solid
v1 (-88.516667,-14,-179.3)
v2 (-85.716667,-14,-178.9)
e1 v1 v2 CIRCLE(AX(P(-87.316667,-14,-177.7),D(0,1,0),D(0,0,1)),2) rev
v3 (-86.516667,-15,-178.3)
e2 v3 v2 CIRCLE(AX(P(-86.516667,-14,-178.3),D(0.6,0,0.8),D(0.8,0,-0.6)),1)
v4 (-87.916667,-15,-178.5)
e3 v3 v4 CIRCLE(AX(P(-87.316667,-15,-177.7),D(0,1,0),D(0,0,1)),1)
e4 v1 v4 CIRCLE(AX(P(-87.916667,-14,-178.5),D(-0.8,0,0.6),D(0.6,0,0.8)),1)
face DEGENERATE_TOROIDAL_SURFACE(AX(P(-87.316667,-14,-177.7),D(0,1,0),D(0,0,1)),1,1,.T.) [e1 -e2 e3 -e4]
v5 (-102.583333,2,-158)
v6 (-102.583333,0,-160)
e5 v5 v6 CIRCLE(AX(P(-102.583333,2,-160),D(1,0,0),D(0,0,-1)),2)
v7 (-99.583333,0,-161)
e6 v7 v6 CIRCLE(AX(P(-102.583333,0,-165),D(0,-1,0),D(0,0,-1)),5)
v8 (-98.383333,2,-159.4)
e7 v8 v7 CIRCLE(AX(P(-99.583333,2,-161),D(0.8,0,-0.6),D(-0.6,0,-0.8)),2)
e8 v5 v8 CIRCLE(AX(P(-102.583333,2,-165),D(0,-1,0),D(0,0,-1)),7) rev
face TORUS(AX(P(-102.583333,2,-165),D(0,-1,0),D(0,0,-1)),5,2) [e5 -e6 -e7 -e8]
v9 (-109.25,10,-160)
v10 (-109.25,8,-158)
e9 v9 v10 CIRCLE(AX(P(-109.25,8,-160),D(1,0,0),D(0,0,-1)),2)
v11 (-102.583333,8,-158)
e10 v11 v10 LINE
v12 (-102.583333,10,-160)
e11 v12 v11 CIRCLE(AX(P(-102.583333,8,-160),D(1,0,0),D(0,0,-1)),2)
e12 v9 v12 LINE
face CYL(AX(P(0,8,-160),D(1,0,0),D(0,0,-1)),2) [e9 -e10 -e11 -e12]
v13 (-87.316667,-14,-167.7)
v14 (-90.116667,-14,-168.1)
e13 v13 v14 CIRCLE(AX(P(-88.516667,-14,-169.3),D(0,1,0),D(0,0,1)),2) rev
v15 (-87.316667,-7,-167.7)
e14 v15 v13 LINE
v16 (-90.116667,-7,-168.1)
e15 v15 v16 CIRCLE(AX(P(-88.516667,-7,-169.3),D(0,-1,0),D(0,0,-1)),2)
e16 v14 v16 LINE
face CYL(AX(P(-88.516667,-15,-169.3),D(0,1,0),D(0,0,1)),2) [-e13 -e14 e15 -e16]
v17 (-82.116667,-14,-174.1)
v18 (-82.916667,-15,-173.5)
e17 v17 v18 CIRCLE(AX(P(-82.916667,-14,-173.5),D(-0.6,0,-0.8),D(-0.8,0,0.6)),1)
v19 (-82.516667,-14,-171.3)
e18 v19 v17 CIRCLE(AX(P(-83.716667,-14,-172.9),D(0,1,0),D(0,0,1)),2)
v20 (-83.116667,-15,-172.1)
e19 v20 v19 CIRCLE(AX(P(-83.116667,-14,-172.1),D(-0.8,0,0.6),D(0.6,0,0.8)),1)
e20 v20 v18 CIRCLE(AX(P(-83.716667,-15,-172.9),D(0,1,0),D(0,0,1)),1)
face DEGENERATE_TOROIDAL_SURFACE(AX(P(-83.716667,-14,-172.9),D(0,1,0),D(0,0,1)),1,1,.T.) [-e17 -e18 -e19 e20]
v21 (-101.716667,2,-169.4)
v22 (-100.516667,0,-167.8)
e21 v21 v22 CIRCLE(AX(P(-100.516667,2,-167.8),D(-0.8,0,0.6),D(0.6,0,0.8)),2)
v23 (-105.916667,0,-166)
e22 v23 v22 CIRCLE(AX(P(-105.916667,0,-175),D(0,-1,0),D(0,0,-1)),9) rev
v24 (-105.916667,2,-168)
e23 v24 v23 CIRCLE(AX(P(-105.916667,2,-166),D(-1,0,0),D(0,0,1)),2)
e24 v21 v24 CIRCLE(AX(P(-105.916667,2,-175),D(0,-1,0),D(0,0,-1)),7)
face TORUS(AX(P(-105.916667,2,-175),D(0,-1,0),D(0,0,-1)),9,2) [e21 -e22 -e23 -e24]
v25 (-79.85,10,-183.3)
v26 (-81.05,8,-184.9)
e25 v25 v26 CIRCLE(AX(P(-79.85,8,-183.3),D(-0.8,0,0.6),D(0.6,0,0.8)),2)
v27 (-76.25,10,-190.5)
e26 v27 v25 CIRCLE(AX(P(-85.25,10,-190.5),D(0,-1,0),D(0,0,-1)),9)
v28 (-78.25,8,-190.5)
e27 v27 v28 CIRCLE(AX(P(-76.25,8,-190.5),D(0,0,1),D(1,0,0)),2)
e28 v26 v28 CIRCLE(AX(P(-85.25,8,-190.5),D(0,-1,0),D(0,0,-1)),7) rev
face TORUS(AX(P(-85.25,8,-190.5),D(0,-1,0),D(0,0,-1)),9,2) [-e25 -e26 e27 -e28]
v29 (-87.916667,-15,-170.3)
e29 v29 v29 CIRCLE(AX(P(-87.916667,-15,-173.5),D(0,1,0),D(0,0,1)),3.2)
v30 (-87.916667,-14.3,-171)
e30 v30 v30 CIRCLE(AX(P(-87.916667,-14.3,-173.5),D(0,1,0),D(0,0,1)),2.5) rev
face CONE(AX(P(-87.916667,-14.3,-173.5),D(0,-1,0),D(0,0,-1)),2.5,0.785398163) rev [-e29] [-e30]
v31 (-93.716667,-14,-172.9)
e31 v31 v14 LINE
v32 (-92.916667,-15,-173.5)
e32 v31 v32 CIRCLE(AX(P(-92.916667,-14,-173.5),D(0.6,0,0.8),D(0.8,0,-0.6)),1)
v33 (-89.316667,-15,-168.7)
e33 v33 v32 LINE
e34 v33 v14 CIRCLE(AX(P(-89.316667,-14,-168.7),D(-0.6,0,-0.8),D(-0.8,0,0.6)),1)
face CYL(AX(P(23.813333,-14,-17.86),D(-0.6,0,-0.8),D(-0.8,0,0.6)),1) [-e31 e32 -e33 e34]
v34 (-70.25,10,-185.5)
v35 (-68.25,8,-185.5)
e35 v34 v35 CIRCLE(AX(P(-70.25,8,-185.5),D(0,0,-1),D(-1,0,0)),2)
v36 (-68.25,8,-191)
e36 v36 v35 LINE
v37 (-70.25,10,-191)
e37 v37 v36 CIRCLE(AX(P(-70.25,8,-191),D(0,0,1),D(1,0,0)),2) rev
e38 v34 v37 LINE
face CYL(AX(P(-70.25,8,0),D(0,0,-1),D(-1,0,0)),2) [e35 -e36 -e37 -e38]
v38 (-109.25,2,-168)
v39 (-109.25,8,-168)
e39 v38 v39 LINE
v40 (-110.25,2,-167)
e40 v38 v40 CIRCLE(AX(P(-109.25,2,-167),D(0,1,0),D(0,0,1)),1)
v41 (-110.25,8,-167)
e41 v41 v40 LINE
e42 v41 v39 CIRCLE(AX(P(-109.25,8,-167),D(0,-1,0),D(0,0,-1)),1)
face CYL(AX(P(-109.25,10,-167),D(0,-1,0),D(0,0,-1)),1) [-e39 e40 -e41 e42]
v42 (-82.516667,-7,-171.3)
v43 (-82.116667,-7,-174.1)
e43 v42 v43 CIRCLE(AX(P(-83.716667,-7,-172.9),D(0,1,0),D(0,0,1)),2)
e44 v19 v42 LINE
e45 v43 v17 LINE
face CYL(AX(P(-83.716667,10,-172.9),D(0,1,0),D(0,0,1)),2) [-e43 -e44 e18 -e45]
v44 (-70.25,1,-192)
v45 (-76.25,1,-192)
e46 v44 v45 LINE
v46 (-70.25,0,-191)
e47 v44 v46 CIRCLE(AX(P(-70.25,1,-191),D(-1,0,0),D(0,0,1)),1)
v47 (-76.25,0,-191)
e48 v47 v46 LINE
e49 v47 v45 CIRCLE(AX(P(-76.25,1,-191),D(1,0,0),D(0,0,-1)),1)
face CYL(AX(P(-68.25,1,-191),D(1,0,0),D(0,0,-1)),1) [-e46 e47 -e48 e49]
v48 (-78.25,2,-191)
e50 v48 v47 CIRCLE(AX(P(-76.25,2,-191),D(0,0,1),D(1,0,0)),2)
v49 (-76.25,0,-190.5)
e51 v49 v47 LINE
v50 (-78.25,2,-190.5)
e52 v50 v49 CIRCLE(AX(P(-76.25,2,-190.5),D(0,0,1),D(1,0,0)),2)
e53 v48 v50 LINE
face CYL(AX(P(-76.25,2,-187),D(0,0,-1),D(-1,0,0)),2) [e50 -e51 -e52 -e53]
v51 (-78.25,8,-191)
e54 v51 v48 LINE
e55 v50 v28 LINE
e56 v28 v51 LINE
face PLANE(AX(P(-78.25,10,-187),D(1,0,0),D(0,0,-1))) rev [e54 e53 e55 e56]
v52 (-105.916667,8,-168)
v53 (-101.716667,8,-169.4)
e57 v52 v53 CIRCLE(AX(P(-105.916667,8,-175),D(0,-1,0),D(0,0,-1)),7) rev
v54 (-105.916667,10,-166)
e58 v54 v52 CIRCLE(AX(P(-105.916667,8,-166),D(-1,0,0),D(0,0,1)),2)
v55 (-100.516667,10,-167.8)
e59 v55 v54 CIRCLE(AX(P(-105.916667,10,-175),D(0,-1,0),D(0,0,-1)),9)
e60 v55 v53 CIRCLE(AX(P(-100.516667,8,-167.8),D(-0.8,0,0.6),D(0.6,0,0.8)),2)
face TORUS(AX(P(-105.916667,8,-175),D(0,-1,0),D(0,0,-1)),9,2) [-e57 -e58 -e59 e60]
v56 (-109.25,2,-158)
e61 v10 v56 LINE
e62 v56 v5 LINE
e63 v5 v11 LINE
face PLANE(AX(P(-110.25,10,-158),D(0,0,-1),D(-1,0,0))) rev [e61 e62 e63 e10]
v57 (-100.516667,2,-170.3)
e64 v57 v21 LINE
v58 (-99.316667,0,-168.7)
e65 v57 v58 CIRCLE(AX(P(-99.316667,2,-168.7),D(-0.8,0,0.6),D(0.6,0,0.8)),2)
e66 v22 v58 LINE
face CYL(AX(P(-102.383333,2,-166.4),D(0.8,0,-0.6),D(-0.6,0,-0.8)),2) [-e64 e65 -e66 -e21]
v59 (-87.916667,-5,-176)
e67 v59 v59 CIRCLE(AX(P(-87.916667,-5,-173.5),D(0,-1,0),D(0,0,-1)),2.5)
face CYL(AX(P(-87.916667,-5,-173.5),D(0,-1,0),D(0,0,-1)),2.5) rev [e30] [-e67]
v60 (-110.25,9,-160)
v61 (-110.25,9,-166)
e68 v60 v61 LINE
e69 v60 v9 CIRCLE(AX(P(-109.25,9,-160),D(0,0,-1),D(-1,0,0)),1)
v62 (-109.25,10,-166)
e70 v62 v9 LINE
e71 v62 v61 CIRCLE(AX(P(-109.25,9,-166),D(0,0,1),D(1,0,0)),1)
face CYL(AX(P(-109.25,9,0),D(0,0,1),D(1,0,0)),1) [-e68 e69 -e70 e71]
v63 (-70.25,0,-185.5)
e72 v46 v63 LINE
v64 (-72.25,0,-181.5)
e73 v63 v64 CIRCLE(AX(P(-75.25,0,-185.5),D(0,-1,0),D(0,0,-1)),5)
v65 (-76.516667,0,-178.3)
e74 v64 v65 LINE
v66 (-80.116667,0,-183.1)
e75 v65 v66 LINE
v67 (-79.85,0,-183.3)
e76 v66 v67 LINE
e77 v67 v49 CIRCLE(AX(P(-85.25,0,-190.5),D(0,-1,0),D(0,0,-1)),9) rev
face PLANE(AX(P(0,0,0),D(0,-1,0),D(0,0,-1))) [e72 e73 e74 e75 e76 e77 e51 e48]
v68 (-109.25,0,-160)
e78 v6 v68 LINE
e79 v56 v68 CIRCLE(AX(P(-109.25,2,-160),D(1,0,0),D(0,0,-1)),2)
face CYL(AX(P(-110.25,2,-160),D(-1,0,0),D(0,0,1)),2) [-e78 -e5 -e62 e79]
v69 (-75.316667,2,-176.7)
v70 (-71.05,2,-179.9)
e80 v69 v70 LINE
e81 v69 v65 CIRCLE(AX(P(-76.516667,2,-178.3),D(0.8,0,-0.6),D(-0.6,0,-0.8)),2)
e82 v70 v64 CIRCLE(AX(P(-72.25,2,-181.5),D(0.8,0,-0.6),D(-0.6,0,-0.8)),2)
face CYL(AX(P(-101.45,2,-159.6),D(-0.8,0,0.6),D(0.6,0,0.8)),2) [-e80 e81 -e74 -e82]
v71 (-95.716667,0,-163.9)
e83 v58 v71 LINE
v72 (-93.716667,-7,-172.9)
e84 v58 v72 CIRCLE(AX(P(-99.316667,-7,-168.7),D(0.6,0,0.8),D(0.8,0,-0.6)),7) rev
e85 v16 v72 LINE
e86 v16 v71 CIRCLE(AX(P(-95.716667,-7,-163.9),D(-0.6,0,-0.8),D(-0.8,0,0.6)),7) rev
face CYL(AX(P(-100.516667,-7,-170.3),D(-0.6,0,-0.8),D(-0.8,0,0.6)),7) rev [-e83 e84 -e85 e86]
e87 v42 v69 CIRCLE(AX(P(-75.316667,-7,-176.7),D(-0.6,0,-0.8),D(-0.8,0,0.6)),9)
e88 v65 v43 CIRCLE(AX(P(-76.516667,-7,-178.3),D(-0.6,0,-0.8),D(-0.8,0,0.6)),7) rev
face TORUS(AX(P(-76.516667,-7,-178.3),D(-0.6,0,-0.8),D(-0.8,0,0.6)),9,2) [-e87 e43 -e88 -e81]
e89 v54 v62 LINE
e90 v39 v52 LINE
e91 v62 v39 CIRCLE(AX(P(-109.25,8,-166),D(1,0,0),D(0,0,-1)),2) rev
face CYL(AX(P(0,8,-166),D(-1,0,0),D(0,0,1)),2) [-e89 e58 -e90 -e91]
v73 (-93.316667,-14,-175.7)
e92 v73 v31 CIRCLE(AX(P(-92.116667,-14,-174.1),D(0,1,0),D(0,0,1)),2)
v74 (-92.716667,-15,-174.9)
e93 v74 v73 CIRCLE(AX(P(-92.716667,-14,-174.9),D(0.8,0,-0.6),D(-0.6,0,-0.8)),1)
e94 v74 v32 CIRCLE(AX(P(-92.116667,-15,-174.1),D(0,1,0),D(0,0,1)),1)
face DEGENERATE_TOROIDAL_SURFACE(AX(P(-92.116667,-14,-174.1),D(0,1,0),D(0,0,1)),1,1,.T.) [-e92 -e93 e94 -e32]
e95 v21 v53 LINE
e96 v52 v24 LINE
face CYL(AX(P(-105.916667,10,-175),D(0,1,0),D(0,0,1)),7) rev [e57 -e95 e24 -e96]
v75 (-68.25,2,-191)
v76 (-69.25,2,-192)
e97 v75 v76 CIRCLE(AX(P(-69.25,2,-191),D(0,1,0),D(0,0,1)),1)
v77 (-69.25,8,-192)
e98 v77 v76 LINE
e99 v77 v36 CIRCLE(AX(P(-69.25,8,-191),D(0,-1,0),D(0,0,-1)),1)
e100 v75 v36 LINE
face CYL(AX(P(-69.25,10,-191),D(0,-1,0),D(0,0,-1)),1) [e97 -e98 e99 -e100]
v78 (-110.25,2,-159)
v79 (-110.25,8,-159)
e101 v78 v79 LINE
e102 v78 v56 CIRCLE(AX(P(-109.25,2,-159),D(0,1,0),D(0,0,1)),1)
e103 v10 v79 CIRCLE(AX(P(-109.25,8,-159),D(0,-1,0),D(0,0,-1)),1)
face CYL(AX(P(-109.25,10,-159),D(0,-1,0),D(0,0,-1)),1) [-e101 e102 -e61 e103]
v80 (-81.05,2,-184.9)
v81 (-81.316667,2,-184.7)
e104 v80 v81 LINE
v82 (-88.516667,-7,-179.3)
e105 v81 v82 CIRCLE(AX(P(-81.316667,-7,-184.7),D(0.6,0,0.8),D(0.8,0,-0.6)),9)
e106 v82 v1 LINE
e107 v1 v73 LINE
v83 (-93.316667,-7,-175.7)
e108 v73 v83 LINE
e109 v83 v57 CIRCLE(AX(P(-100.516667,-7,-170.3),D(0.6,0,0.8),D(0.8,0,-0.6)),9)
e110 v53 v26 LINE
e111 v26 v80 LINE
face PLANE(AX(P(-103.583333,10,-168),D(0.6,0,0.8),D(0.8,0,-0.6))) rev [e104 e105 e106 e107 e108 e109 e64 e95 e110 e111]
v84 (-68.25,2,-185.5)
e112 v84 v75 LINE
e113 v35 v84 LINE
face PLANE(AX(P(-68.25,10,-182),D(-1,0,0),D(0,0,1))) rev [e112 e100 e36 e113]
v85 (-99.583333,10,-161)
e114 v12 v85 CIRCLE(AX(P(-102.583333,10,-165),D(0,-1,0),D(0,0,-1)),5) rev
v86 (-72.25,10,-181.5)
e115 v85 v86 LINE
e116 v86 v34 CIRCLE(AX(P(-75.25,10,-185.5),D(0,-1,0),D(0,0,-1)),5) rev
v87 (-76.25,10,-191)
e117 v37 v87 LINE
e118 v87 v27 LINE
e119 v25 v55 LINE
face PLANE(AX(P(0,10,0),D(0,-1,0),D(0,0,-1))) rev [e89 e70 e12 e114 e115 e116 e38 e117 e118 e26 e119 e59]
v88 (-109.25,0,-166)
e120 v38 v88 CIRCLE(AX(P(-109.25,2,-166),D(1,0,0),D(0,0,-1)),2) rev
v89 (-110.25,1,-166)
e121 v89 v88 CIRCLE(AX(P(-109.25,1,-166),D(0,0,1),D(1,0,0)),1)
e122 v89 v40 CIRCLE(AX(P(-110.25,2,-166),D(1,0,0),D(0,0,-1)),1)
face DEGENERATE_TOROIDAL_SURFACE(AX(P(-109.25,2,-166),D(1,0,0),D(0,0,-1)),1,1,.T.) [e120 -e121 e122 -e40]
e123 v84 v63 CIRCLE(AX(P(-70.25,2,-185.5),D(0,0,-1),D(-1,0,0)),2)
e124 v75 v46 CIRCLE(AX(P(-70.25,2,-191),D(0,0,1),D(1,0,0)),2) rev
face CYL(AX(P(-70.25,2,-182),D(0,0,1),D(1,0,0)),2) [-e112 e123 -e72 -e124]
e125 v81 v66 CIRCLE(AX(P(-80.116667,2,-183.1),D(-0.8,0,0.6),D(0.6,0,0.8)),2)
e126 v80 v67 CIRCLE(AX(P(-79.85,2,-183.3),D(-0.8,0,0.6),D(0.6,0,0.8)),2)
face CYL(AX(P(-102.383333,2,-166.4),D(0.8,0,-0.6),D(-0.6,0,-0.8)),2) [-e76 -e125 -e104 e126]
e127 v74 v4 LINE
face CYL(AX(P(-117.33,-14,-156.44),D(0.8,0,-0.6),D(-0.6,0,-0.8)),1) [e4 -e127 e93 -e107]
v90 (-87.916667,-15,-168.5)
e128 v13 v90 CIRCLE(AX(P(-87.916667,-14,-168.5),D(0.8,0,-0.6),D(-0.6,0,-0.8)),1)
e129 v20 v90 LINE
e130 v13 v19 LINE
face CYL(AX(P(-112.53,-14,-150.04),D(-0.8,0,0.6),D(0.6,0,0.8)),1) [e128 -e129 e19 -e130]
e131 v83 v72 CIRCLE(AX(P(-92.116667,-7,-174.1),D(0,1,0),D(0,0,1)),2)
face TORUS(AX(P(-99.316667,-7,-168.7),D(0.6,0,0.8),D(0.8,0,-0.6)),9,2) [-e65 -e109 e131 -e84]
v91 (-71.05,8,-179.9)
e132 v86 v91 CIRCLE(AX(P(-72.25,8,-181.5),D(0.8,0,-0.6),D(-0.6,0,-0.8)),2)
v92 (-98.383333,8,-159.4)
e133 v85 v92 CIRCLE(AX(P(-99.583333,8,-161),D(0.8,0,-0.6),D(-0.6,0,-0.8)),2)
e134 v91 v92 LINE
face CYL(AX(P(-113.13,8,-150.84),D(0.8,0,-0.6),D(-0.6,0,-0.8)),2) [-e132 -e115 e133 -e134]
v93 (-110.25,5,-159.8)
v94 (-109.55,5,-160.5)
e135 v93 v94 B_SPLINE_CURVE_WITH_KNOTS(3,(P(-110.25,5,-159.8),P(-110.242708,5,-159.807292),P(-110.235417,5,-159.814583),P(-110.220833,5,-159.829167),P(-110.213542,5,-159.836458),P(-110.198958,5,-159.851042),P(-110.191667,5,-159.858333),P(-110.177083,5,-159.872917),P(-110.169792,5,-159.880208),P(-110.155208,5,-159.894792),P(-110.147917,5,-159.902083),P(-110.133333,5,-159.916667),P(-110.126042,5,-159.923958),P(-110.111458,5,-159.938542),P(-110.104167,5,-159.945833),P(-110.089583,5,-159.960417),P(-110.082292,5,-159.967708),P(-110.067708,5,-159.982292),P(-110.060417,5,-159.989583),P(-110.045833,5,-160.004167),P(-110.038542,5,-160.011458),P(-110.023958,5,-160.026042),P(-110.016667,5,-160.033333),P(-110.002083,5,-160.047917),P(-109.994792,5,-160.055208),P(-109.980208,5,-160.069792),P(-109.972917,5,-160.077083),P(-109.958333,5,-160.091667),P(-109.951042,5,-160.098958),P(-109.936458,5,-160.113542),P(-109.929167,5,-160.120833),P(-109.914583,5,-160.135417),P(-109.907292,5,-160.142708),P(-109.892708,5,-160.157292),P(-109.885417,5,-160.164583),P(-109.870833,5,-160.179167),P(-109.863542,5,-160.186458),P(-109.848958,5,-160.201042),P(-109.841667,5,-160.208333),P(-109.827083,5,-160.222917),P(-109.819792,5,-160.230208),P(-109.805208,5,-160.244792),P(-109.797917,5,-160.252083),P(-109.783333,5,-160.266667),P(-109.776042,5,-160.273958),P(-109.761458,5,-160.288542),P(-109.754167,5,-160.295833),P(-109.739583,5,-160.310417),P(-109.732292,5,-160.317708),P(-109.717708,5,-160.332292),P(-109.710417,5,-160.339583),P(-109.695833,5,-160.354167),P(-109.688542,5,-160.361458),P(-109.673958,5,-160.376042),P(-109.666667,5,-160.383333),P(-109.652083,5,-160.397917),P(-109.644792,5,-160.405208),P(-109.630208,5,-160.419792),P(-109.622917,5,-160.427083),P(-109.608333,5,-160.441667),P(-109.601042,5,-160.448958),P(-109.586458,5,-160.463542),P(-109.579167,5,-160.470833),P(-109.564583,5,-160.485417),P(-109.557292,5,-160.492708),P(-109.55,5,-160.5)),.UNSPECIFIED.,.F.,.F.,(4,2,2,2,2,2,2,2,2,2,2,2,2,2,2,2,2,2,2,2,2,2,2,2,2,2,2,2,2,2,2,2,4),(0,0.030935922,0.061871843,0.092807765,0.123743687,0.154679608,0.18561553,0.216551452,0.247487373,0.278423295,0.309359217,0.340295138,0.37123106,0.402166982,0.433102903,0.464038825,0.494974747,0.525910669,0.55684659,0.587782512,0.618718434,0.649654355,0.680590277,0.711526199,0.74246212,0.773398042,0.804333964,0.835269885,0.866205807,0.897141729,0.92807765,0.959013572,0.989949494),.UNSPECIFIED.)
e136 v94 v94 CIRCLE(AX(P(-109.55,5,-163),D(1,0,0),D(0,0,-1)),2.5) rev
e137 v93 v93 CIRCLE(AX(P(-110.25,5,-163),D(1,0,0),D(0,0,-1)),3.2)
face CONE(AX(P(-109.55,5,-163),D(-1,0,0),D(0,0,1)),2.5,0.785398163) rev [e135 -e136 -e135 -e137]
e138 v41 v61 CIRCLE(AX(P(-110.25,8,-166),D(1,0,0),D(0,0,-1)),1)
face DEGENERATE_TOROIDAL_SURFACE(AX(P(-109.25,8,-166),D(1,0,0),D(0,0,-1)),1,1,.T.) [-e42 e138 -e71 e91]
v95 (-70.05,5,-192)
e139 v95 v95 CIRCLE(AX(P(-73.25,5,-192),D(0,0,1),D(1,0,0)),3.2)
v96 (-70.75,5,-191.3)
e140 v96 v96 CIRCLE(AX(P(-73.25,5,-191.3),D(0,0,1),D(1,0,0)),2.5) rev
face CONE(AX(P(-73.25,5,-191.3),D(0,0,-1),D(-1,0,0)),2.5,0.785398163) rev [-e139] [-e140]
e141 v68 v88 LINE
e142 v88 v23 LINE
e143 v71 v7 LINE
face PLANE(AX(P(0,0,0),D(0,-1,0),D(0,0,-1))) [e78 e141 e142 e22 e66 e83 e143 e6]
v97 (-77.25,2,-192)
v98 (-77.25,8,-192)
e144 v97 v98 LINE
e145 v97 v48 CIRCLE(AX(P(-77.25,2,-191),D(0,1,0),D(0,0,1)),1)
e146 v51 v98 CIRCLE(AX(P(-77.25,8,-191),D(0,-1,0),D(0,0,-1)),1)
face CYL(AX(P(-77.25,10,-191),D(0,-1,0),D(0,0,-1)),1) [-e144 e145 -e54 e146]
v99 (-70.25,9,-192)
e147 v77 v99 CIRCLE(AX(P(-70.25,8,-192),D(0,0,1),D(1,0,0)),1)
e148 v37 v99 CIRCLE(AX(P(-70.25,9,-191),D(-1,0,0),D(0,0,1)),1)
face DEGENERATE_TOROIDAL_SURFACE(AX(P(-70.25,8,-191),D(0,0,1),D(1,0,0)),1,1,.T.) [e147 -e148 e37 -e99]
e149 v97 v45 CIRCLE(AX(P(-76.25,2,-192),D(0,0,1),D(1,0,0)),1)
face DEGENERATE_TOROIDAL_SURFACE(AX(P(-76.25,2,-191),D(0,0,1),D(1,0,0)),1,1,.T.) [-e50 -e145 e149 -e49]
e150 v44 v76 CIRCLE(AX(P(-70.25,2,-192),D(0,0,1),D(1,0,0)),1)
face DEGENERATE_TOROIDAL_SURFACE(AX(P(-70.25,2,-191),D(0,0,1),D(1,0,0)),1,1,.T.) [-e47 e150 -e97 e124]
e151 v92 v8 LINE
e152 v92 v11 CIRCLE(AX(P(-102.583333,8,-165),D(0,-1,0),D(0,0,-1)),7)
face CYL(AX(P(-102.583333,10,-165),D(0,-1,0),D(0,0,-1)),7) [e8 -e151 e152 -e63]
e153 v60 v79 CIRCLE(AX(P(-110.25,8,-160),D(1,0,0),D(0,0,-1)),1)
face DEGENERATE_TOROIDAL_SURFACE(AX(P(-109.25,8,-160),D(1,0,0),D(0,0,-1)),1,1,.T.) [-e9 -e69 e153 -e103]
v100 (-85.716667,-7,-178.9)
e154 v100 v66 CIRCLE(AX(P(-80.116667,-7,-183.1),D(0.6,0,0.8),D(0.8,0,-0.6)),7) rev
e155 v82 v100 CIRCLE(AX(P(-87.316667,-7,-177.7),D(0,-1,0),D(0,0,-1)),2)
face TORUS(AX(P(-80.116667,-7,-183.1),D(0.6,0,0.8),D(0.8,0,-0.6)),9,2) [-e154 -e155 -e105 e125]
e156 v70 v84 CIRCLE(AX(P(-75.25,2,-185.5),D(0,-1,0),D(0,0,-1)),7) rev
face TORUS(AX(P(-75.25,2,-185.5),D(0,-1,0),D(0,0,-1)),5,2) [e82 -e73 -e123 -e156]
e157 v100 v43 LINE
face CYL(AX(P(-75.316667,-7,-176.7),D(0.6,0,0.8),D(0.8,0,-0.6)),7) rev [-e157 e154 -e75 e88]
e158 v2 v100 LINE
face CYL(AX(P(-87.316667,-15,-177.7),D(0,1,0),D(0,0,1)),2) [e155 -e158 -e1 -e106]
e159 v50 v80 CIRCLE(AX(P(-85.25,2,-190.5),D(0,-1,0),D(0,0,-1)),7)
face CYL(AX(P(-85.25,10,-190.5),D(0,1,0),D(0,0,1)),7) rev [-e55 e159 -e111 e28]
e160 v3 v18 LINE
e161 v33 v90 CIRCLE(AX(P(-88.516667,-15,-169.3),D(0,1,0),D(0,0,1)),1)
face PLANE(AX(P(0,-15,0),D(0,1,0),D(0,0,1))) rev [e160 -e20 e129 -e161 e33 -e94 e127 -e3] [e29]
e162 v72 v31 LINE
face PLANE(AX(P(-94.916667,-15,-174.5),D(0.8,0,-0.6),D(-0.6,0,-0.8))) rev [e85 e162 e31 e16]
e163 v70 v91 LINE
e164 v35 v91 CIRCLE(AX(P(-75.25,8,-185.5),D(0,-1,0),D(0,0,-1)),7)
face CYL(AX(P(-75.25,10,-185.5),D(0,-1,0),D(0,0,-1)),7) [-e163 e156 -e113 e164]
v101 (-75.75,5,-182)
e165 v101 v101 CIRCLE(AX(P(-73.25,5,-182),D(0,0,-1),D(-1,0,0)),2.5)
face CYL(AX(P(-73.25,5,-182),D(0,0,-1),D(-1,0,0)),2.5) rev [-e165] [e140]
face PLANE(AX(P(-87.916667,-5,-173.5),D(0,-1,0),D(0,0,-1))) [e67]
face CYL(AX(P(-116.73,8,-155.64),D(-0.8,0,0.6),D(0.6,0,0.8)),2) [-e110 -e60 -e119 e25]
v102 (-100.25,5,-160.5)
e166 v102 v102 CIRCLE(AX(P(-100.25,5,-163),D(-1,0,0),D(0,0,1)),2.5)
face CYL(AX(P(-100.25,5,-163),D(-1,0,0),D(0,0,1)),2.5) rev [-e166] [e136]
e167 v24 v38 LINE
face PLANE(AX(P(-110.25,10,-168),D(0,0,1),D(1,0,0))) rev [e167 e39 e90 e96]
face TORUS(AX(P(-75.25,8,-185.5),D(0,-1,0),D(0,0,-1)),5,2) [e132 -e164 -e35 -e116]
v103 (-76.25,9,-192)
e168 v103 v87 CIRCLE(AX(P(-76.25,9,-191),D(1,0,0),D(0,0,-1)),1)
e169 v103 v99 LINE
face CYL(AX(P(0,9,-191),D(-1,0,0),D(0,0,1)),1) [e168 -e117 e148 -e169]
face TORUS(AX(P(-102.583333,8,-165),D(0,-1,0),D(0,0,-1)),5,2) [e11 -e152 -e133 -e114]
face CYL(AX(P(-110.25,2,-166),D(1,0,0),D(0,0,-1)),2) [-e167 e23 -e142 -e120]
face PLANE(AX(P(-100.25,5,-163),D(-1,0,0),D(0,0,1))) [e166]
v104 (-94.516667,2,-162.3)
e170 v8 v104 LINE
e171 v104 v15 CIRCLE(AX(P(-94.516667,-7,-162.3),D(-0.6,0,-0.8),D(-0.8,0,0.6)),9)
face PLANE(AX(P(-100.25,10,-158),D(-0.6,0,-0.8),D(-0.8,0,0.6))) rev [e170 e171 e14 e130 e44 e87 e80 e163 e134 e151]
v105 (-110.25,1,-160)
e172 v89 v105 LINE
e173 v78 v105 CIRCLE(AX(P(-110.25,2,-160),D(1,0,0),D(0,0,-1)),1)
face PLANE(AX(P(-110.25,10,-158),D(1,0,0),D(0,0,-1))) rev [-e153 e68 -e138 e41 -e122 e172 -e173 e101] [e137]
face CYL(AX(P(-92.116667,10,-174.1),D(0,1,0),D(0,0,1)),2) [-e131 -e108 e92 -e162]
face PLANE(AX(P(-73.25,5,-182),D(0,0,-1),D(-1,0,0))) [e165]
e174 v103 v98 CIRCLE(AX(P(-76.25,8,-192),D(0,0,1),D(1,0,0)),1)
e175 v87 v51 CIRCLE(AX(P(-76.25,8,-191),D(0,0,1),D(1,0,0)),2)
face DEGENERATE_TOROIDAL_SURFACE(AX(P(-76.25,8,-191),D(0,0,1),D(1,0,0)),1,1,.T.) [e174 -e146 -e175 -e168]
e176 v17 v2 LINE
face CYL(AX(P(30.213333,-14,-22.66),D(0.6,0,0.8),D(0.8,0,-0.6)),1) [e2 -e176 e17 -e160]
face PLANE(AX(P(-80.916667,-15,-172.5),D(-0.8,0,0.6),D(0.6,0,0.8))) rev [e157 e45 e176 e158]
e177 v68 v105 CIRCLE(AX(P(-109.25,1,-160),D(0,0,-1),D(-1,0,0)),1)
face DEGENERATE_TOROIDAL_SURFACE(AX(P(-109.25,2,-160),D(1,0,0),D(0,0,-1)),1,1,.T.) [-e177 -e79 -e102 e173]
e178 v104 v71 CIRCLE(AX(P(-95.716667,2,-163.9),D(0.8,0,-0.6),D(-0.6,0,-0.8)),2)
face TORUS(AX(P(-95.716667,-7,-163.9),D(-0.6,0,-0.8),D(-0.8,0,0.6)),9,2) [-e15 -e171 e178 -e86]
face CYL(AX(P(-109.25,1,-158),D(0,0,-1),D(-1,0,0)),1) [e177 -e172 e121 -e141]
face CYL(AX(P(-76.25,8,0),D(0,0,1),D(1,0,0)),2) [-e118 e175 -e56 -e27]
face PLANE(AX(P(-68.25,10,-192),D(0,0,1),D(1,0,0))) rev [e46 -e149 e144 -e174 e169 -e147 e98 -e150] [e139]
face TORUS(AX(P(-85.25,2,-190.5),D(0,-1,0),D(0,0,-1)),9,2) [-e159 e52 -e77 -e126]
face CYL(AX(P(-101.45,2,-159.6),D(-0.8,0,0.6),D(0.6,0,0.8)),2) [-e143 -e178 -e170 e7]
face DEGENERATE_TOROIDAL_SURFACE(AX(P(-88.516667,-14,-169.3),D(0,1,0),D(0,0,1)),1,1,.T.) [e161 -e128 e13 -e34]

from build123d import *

# Parameters (mm, degrees)
BOSS_EXTRUDE1_DEPTH = 10
BOSS_EXTRUDE2_DEPTH = 15
SKETCH4_R           = 2.4999999999999942
CUT_EXTRUDE1_DEPTH  = 10
SKETCH5_R           = 2.4999999999999956
CUT_EXTRUDE2_DEPTH  = 10
SKETCH6_R           = 2.5000000000000093
CUT_EXTRUDE3_DEPTH  = 10
CHAMFER1_SIZE       = 0.7
FILLET1_R           = 7
FILLET2_R           = 1
FILLET3_R           = 2


with BuildPart() as part:
    # Sketch2 → Boss-Extrude1 (new body)
    with BuildSketch(Plane(origin=(0, 0, 0), x_dir=(1, 0, 0), z_dir=(0, 1, 0))):
        Polygon((-110.24999999999997, 168), (-103.5833333333333, 168), (-78.25, 187), (-78.25, 192), (-68.24999999999999, 192), (-68.24999999999999, 182), (-100.24999999999997, 158), (-110.24999999999997, 158), align=None)
    extrude(amount=BOSS_EXTRUDE1_DEPTH)

    # Sketch3 → Boss-Extrude2 (add)
    with BuildSketch(Plane.XZ):
        Polygon((-94.91666666666667, -174.5), (-88.91666666666667, -166.49999999999997), (-80.91666666666664, -172.50000000000003), (-86.91666666666663, -180.50000000000003), align=None)
    extrude(amount=BOSS_EXTRUDE2_DEPTH)

    # Sketch4 → Cut-Extrude1 (cut)
    with BuildSketch(Plane(origin=(0, 0, -192), x_dir=(-1, 0, 0), z_dir=(0, 0, -1))):
        with Locations((73.25, 5)):
            Circle(SKETCH4_R)
    extrude(amount=-CUT_EXTRUDE1_DEPTH, mode=Mode.SUBTRACT)

    # Sketch5 → Cut-Extrude2 (cut)
    with BuildSketch(Plane.ZY.offset(110.24999999999997)):
        with Locations((-163, 5)):
            Circle(SKETCH5_R)
    extrude(amount=-CUT_EXTRUDE2_DEPTH, mode=Mode.SUBTRACT)

    # Sketch6 → Cut-Extrude3 (cut)
    with BuildSketch(Plane.XZ.offset(15)):
        with Locations(Location((-87.91666666666666, -173.5, 0), (0, 0, 270))):
            Circle(SKETCH6_R)
    extrude(amount=-CUT_EXTRUDE3_DEPTH, mode=Mode.SUBTRACT)

    # Chamfer1
    chamfer1_edges = [part.edges().sort_by_distance(p)[0] for p in [
        (-70.75, 5, -192),
        (-110.24999999999997, 5, -165.5),
        (-87.91666666666666, -15, -171),
    ]]
    chamfer(chamfer1_edges, length=CHAMFER1_SIZE)

    # Fillet1
    fillet1_edges = [part.edges().sort_by_distance(p)[0] for p in [
        (-103.5833333333333, 5, -168),
        (-78.25, 5, -187),
        (-68.24999999999999, 5, -182),
        (-100.24999999999997, 5, -158),
        (-83.91666666666663, 0, -176.50000000000003),
        (-91.91666666666667, 0, -170.5),
    ]]
    fillet(fillet1_edges, radius=FILLET1_R)

    # Fillet2
    fillet2_edges = [part.edges().sort_by_distance(p)[0] for p in [
        (-110.24999999999997, 0, -163),
        (-110.24999999999997, 5, -168),
        (-78.25, 5, -192),
        (-68.24999999999999, 5, -192),
        (-110.24999999999997, 5, -158),
        (-73.25, 10, -192),
        (-90.91666666666666, -15, -177.5),
        (-83.91666666666663, -15, -176.50000000000003),
        (-84.91666666666666, -15, -169.5),
        (-91.91666666666667, -15, -170.5),
        (-110.24999999999997, 10, -163),
        (-73.25, 0, -192),
    ]]
    fillet(fillet2_edges, radius=FILLET2_R)

    # Fillet3
    # the kernel refuses this fillet: 2 mm, written as the material it takes off along each edge
    with BuildSketch(Plane(origin=(-110.24999999999997, 8, -166), x_dir=(0, 1, 0), z_dir=(0, 0, 1))) as fillet3_piece_1:
        with BuildLine():
            CenterArc((1, -1), 1, 0, 90)
            Line((2, -1), (2, 0))
            Line((2, 0), (1, 0))
        make_face()
    revolve(axis=Axis((-110.24999999999997, 8, -166), (-1, 0, 0)), revolution_arc=90, mode=Mode.SUBTRACT)
    with BuildSketch(Plane(origin=(-110.24999999999997, 2, -166), x_dir=(0, 0, -1), z_dir=(0, 1, 0))) as fillet3_piece_2:
        with BuildLine():
            CenterArc((1, -1), 1, 0, 90)
            Line((2, -1), (2, 0))
            Line((2, 0), (1, 0))
        make_face()
    revolve(axis=Axis((-110.24999999999997, 2, -166), (-1, 0, 0)), revolution_arc=90, mode=Mode.SUBTRACT)
    with BuildSketch(Plane(origin=(-110.24999999999997, 8, -160), x_dir=(0, 0, 1), z_dir=(0, -1, 0))) as fillet3_piece_3:
        with BuildLine():
            CenterArc((1, -1), 1, 0, 90)
            Line((2, -1), (2, 0))
            Line((2, 0), (1, 0))
        make_face()
    revolve(axis=Axis((-110.24999999999997, 8, -160), (-1, 0, 0)), revolution_arc=90, mode=Mode.SUBTRACT)
    with BuildSketch(Plane(origin=(-110.24999999999997, 1.9999999999999998, -160), x_dir=(0, -1, 0), z_dir=(0, 0, -1))) as fillet3_piece_4:
        with BuildLine():
            CenterArc((1, -1), 1, 0, 90)
            Line((2, -1), (2, 0))
            Line((2, 0), (1, 0))
        make_face()
    revolve(axis=Axis((-110.24999999999997, 1.9999999999999998, -160), (-1, 0, 0)), revolution_arc=90, mode=Mode.SUBTRACT)
    with BuildSketch(Plane(origin=(-76.25, 8, -192), x_dir=(-1, 0, 0), z_dir=(0, -1, 0))) as fillet3_piece_5:
        with BuildLine():
            CenterArc((1, -1), 1, 0, 90)
            Line((2, -1), (2, 0))
            Line((2, 0), (1, 0))
        make_face()
    revolve(axis=Axis((-76.25, 8, -192), (0, 0, -1)), revolution_arc=90, mode=Mode.SUBTRACT)
    with BuildSketch(Plane(origin=(-76.25, 1.9999999999999998, -192), x_dir=(0, -1, 0), z_dir=(1, 0, 0))) as fillet3_piece_6:
        with BuildLine():
            CenterArc((1, -1), 1, 0, 90)
            Line((2, -1), (2, 0))
            Line((2, 0), (1, 0))
        make_face()
    revolve(axis=Axis((-76.25, 1.9999999999999998, -192), (0, 0, -1)), revolution_arc=90, mode=Mode.SUBTRACT)
    with BuildSketch(Plane(origin=(-70.24999999999999, 8, -192), x_dir=(0, 1, 0), z_dir=(-1, 0, 0))) as fillet3_piece_7:
        with BuildLine():
            CenterArc((1, -1), 1, 0, 90)
            Line((2, -1), (2, 0))
            Line((2, 0), (1, 0))
        make_face()
    revolve(axis=Axis((-70.24999999999999, 8, -192), (0, 0, -1)), revolution_arc=90, mode=Mode.SUBTRACT)
    with BuildSketch(Plane(origin=(-70.24999999999999, 1.9999999999999998, -192), x_dir=(1, 0, 0), z_dir=(0, 1, 0))) as fillet3_piece_8:
        with BuildLine():
            CenterArc((1, -1), 1, 0, 90)
            Line((2, -1), (2, 0))
            Line((2, 0), (1, 0))
        make_face()
    revolve(axis=Axis((-70.24999999999999, 1.9999999999999998, -192), (0, 0, -1)), revolution_arc=90, mode=Mode.SUBTRACT)
    with BuildSketch(Plane(origin=(-87.31666666666665, -15, -177.70000000000002), x_dir=(-0.6000000000000005, 0, -0.7999999999999996), z_dir=(-0.7999999999999996, 0, 0.6000000000000005))) as fillet3_piece_9:
        with BuildLine():
            CenterArc((1, -1), 1, 0, 90)
            Line((2, -1), (2, 0))
            Line((2, 0), (1, 0))
        make_face()
    revolve(axis=Axis((-87.31666666666665, -15, -177.70000000000002), (0, -1, 0)), revolution_arc=90.00000000000011, mode=Mode.SUBTRACT)
    with BuildSketch(Plane(origin=(-92.11666666666667, -15, -174.1), x_dir=(-0.800000000000001, 0, 0.5999999999999986), z_dir=(0.5999999999999986, 0, 0.800000000000001))) as fillet3_piece_10:
        with BuildLine():
            CenterArc((1, -1), 1, 0, 90)
            Line((2, -1), (2, 0))
            Line((2, 0), (1, 0))
        make_face()
    revolve(axis=Axis((-92.11666666666667, -15, -174.1), (0, -1, 0)), revolution_arc=89.99999999999987, mode=Mode.SUBTRACT)
    with BuildSketch(Plane(origin=(-83.71666666666663, -15, -172.9), x_dir=(0.8000000000000007, 0, -0.5999999999999991), z_dir=(-0.5999999999999991, 0, -0.8000000000000007))) as fillet3_piece_11:
        with BuildLine():
            CenterArc((1, -1), 1, 0, 90)
            Line((2, -1), (2, 0))
            Line((2, 0), (1, 0))
        make_face()
    revolve(axis=Axis((-83.71666666666663, -15, -172.9), (0, -1, 0)), revolution_arc=89.99999999999993, mode=Mode.SUBTRACT)
    with BuildSketch(Plane(origin=(-88.51666666666665, -15, -169.29999999999998), x_dir=(0.6000000000000002, 0, 0.7999999999999999), z_dir=(0.7999999999999999, 0, -0.6000000000000002))) as fillet3_piece_12:
        with BuildLine():
            CenterArc((1, -1), 1, 0, 90)
            Line((2, -1), (2, 0))
            Line((2, 0), (1, 0))
        make_face()
    revolve(axis=Axis((-88.51666666666665, -15, -169.29999999999998), (0, -1, 0)), revolution_arc=90.00000000000011, mode=Mode.SUBTRACT)
    with BuildSketch(Plane(origin=(-102.5833333333333, 0, -158), x_dir=(0, 1, 0), z_dir=(-1, 0, 0))) as fillet3_piece_13:
        with BuildLine():
            CenterArc((FILLET3_R, FILLET3_R), FILLET3_R, 180, 90)
            Line((-2.2e-16, FILLET3_R), (0, 0))
            Line((0, 0), (FILLET3_R, 0))
        make_face()
    extrude(amount=7.666666666666671, mode=Mode.SUBTRACT)
    with BuildSketch(Plane(origin=(-102.5833333333333, 10, -158), x_dir=(0, -1, 0), z_dir=(-1, 0, 0))) as fillet3_piece_14:
        with BuildLine():
            CenterArc((FILLET3_R, -FILLET3_R), FILLET3_R, 90, 90)
            Line((0, -FILLET3_R), (0, 0))
            Line((0, 0), (FILLET3_R, 0))
        make_face()
    extrude(amount=7.666666666666671, mode=Mode.SUBTRACT)
    with BuildSketch(Plane(origin=(-78.25, 10, -190.5), x_dir=(1, 0, 0), z_dir=(0, 0, -1))) as fillet3_piece_15:
        with BuildLine():
            CenterArc((FILLET3_R, FILLET3_R), FILLET3_R, 180, 90)
            Line((0, FILLET3_R), (0, 0))
            Line((0, 0), (FILLET3_R, 0))
        make_face()
    extrude(amount=1.5, mode=Mode.SUBTRACT)
    with BuildSketch(Plane(origin=(-78.25, 0, -190.5), x_dir=(0, 1, 0), z_dir=(0, 0, -1))) as fillet3_piece_16:
        with BuildLine():
            CenterArc((FILLET3_R, FILLET3_R), FILLET3_R, 180, 90)
            Line((-2.2e-16, FILLET3_R), (0, 0))
            Line((0, 0), (FILLET3_R, 0))
        make_face()
    extrude(amount=1.5, mode=Mode.SUBTRACT)
    with BuildSketch(Plane(origin=(-88.91666666666667, -6.999999999999999, -166.49999999999997), x_dir=(0.8, 0, -0.6), z_dir=(0, -1, 0))) as fillet3_piece_17:
        with BuildLine():
            CenterArc((FILLET3_R, -FILLET3_R), FILLET3_R, 89.99999999999983, 89.99999999999969)
            Line((1.702e-14, -FILLET3_R), (0, 0))
            Line((0, 0), (FILLET3_R, -8e-17))
        make_face()
    extrude(amount=8, mode=Mode.SUBTRACT)
    with BuildSketch(Plane(origin=(-80.91666666666664, -6.999999999999999, -172.50000000000003), x_dir=(-0.7999999999999924, 0, 0.6000000000000103), z_dir=(0, -1, 0))) as fillet3_piece_18:
        with BuildLine():
            CenterArc((FILLET3_R, FILLET3_R), FILLET3_R, 180, 90.00000000000057)
            Line((-1.999e-14, FILLET3_R), (0, 0))
            Line((0, 0), (FILLET3_R, 1e-17))
        make_face()
    extrude(amount=8, mode=Mode.SUBTRACT)
    with BuildSketch(Plane(origin=(-94.91666666666667, -6.999999999999999, -174.5), x_dir=(0.8000000000000017, 0, -0.5999999999999978), z_dir=(0, -1, 0))) as fillet3_piece_19:
        with BuildLine():
            CenterArc((FILLET3_R, FILLET3_R), FILLET3_R, 180.00000000000023, 89.99999999999943)
            Line((-3e-17, FILLET3_R), (0, 0))
            Line((0, 0), (FILLET3_R, 1e-17))
        make_face()
    extrude(amount=8, mode=Mode.SUBTRACT)
    with BuildSketch(Plane(origin=(-86.91666666666663, -6.999999999999999, -180.50000000000003), x_dir=(-0.8, 0, 0.6), z_dir=(0, -1, 0))) as fillet3_piece_20:
        with BuildLine():
            CenterArc((FILLET3_R, -FILLET3_R), FILLET3_R, 89.99999999999983, 90.0000000000008)
            Line((1.131e-14, -FILLET3_R), (0, 0))
            Line((0, 0), (FILLET3_R, -8e-17))
        make_face()
    extrude(amount=8, mode=Mode.SUBTRACT)
    with BuildSketch(Plane(origin=(-68.24999999999999, 0, -192), x_dir=(0, 1, 0), z_dir=(0, 0, 1))) as fillet3_piece_21:
        with BuildLine():
            CenterArc((FILLET3_R, FILLET3_R), FILLET3_R, 180, 90)
            Line((-2.2e-16, FILLET3_R), (0, 0))
            Line((0, 0), (FILLET3_R, 0))
        make_face()
    extrude(amount=6.5, mode=Mode.SUBTRACT)
    with BuildSketch(Plane(origin=(-68.24999999999999, 10, -192), x_dir=(-1, 0, 0), z_dir=(0, 0, 1))) as fillet3_piece_22:
        with BuildLine():
            CenterArc((FILLET3_R, FILLET3_R), FILLET3_R, 180, 90)
            Line((0, FILLET3_R), (0, 0))
            Line((0, 0), (FILLET3_R, 0))
        make_face()
    extrude(amount=6.5, mode=Mode.SUBTRACT)
    with BuildSketch(Plane(origin=(-81.31666666666663, 0, -184.70000000000002), x_dir=(0, 1, 0), z_dir=(0.7999999999999996, 0, -0.6000000000000005))) as fillet3_piece_23:
        with BuildLine():
            CenterArc((FILLET3_R, FILLET3_R), FILLET3_R, 180, 90)
            Line((-2.2e-16, FILLET3_R), (0, 0))
            Line((0, 0), (FILLET3_R, 0))
        make_face()
    extrude(amount=0.333333333333303, mode=Mode.SUBTRACT)
    with BuildSketch(Plane(origin=(-71.04999999999998, 0, -179.9), x_dir=(2.56e-15, 1, 3.41e-15), z_dir=(-0.7999999999999999, 0, 0.6000000000000002))) as fillet3_piece_24:
        with BuildLine():
            CenterArc((FILLET3_R, FILLET3_R), FILLET3_R, 180, 90.00000000000023)
            Line((-8.75e-15, FILLET3_R), (0, 0))
            Line((0, 0), (FILLET3_R, 0))
        make_face()
    extrude(amount=5.333333333333315, mode=Mode.SUBTRACT)
    with BuildSketch(Plane(origin=(-75.24999999999999, 0, -185.5), x_dir=(0.6000000000000006, 0, 0.7999999999999995), z_dir=(-0.7999999999999995, 0, 0.6000000000000006))) as fillet3_piece_25:
        with BuildLine():
            CenterArc((6.999999999999997 - FILLET3_R, FILLET3_R), FILLET3_R, 270, 90)
            Line((6.999999999999997 - FILLET3_R, -2.2e-16), (6.999999999999997, 0))
            Line((6.999999999999997, 0), (6.999999999999997, FILLET3_R))
        make_face()
    revolve(axis=Axis((-75.24999999999999, 0, -185.5), (0, 1, 0)), revolution_arc=53.13010235415593, mode=Mode.SUBTRACT)
    with BuildSketch(Plane(origin=(-94.51666666666668, 0, -162.29999999999998), x_dir=(-0.6000000000000002, 0, -0.7999999999999998), z_dir=(-0.7999999999999999, 0, 0.6000000000000002))) as fillet3_piece_26:
        with BuildLine():
            CenterArc((FILLET3_R, -FILLET3_R), FILLET3_R, 90, 90)
            Line((0, -FILLET3_R), (0, 0))
            Line((0, 0), (FILLET3_R, 0))
        make_face()
    extrude(amount=4.833333333333281, mode=Mode.SUBTRACT)
    with BuildSketch(Plane(origin=(-71.04999999999998, 10, -179.9), x_dir=(-0.6000000000000002, 0, -0.7999999999999998), z_dir=(-0.7999999999999999, 0, 0.6000000000000002))) as fillet3_piece_27:
        with BuildLine():
            CenterArc((FILLET3_R, FILLET3_R), FILLET3_R, 180, 90)
            Line((-8.53e-15, FILLET3_R), (0, 0))
            Line((0, 0), (FILLET3_R, 0))
        make_face()
    extrude(amount=34.16666666666665, mode=Mode.SUBTRACT)
    with BuildSketch(Plane(origin=(-101.71666666666664, 10, -169.4), x_dir=(0.6000000000000005, 0, 0.7999999999999996), z_dir=(0.7999999999999996, 0, -0.6000000000000005))) as fillet3_piece_28:
        with BuildLine():
            CenterArc((FILLET3_R, FILLET3_R), FILLET3_R, 180, 90)
            Line((0, FILLET3_R), (0, 0))
            Line((0, 0), (FILLET3_R, 0))
        make_face()
    extrude(amount=25.833333333333314, mode=Mode.SUBTRACT)
    with BuildSketch(Plane(origin=(-110.24999999999997, 10, -168), x_dir=(0, 0, 1), z_dir=(1, 0, 0))) as fillet3_piece_29:
        with BuildLine():
            CenterArc((FILLET3_R, FILLET3_R), FILLET3_R, 180, 90)
            Line((0, FILLET3_R), (0, 0))
            Line((0, 0), (FILLET3_R, 0))
        make_face()
    extrude(amount=4.333333333333314, mode=Mode.SUBTRACT)
    with BuildSketch(Plane(origin=(-102.5833333333333, 10, -165), x_dir=(0, 0, 1), z_dir=(-1, 0, 0))) as fillet3_piece_30:
        with BuildLine():
            CenterArc((7 - FILLET3_R, -FILLET3_R), FILLET3_R, 0, 90)
            Line((7 - FILLET3_R, 0), (7, 0))
            Line((7, 0), (7, -FILLET3_R))
        make_face()
    revolve(axis=Axis((-102.5833333333333, 10, -165), (0, 1, 0)), revolution_arc=36.86989764584407, mode=Mode.SUBTRACT)
    with BuildSketch(Plane(origin=(-75.24999999999999, 10, -185.5), x_dir=(0.6000000000000006, 0, 0.7999999999999995), z_dir=(-0.7999999999999995, 0, 0.6000000000000006))) as fillet3_piece_31:
        with BuildLine():
            CenterArc((6.999999999999997 - FILLET3_R, -FILLET3_R), FILLET3_R, 0, 90)
            Line((6.999999999999997, -FILLET3_R), (6.999999999999997, 0))
            Line((6.999999999999997, 0), (6.999999999999997 - FILLET3_R, 0))
        make_face()
    revolve(axis=Axis((-75.24999999999999, 10, -185.5), (0, 1, 0)), revolution_arc=53.13010235415593, mode=Mode.SUBTRACT)
    with BuildSketch(Plane(origin=(-101.71666666666664, 0, -169.4), x_dir=(0.6000000000000005, 0, 0.7999999999999996), z_dir=(0.7999999999999996, 0, -0.6000000000000005))) as fillet3_piece_32:
        with BuildLine():
            CenterArc((FILLET3_R, -FILLET3_R), FILLET3_R, 90, 90)
            Line((0, -FILLET3_R), (0, 0))
            Line((0, 0), (FILLET3_R, 0))
        make_face()
    extrude(amount=1.499999999999966, mode=Mode.SUBTRACT)
    with BuildSketch(Plane(origin=(-110.24999999999997, 0, -168), x_dir=(0, 0, 1), z_dir=(1, 0, 0))) as fillet3_piece_33:
        with BuildLine():
            CenterArc((FILLET3_R, -FILLET3_R), FILLET3_R, 90, 90)
            Line((0, -FILLET3_R), (0, 0))
            Line((0, 0), (FILLET3_R, 0))
        make_face()
    extrude(amount=4.333333333333314, mode=Mode.SUBTRACT)
    with BuildSketch(Plane(origin=(-102.5833333333333, 0, -165), x_dir=(0, 0, 1), z_dir=(-1, 0, 0))) as fillet3_piece_34:
        with BuildLine():
            CenterArc((7 - FILLET3_R, FILLET3_R), FILLET3_R, 270, 90)
            Line((7, FILLET3_R), (7, 0))
            Line((7, 0), (7 - FILLET3_R, 0))
        make_face()
    revolve(axis=Axis((-102.5833333333333, 0, -165), (0, 1, 0)), revolution_arc=36.86989764584407, mode=Mode.SUBTRACT)
    with BuildSketch(Plane(origin=(-85.25, 0, -190.5), x_dir=(0.6000000000000006, 0, 0.7999999999999995), z_dir=(-0.7999999999999995, 0, 0.6000000000000006))) as fillet3_piece_35:
        with BuildLine():
            CenterArc((6.999999999999997 + FILLET3_R, FILLET3_R), FILLET3_R, 180, 90)
            Line((6.999999999999997 + FILLET3_R, -2.2e-16), (6.999999999999997, 0))
            Line((6.999999999999997, 0), (6.999999999999997, FILLET3_R))
        make_face()
    revolve(axis=Axis((-85.25, 0, -190.5), (0, 1, 0)), revolution_arc=53.13010235415593, mode=Mode.SUBTRACT)
    with BuildSketch(Plane(origin=(-85.25, 10, -190.5), x_dir=(0.6000000000000006, 0, 0.7999999999999995), z_dir=(-0.7999999999999995, 0, 0.6000000000000006))) as fillet3_piece_36:
        with BuildLine():
            CenterArc((6.999999999999997 + FILLET3_R, -FILLET3_R), FILLET3_R, 90, 90)
            Line((6.999999999999997, -FILLET3_R), (6.999999999999997, 0))
            Line((6.999999999999997, 0), (6.999999999999997 + FILLET3_R, 0))
        make_face()
    revolve(axis=Axis((-85.25, 10, -190.5), (0, 1, 0)), revolution_arc=53.13010235415593, mode=Mode.SUBTRACT)
    with BuildSketch(Plane(origin=(-105.91666666666666, 0, -175), x_dir=(0, 0, 1), z_dir=(-1, 0, 0))) as fillet3_piece_37:
        with BuildLine():
            CenterArc((7 + FILLET3_R, FILLET3_R), FILLET3_R, 180, 90)
            Line((7, FILLET3_R), (7, 0))
            Line((7, 0), (7 + FILLET3_R, 0))
        make_face()
    revolve(axis=Axis((-105.91666666666666, 0, -175), (0, 1, 0)), revolution_arc=36.86989764584416, mode=Mode.SUBTRACT)
    with BuildSketch(Plane(origin=(-105.91666666666666, 10, -175), x_dir=(0, 0, 1), z_dir=(-1, 0, 0))) as fillet3_piece_38:
        with BuildLine():
            CenterArc((7 + FILLET3_R, -FILLET3_R), FILLET3_R, 90, 90)
            Line((7, -FILLET3_R), (7, 0))
            Line((7, 0), (7 + FILLET3_R, 0))
        make_face()
    revolve(axis=Axis((-105.91666666666666, 10, -175), (0, 1, 0)), revolution_arc=36.86989764584416, mode=Mode.SUBTRACT)
    with BuildSketch(Plane(origin=(-100.51666666666665, -6.999999999999999, -170.29999999999995), x_dir=(0, 1, 0), z_dir=(-0.800000000000001, 0, 0.5999999999999986))) as fillet3_piece_39:
        with BuildLine():
            CenterArc((7 + FILLET3_R, -FILLET3_R), FILLET3_R, 90, 90)
            Line((7 + FILLET3_R, 0), (7, 0))
            Line((7, 0), (7, -FILLET3_R))
        make_face()
    revolve(axis=Axis((-100.51666666666665, -6.999999999999999, -170.29999999999995), (-0.5999999999999986, 0, -0.800000000000001)), revolution_arc=89.99999999999994, mode=Mode.SUBTRACT)
    with BuildSketch(Plane(origin=(-94.51666666666668, -6.999999999999999, -162.29999999999998), x_dir=(0, 1, 0), z_dir=(-0.800000000000001, 0, 0.5999999999999986))) as fillet3_piece_40:
        with BuildLine():
            CenterArc((7 + FILLET3_R, FILLET3_R), FILLET3_R, 180.00000000000088, 89.99999999999909)
            Line((7, FILLET3_R), (7, 0))
            Line((7, 0), (7 + FILLET3_R, 0))
        make_face()
    revolve(axis=Axis((-94.51666666666668, -6.999999999999999, -162.29999999999998), (-0.5999999999999986, 0, -0.800000000000001)), revolution_arc=90, mode=Mode.SUBTRACT)
    with BuildSketch(Plane(origin=(-75.31666666666663, -6.999999999999999, -176.70000000000002), x_dir=(-0.8000000000000013, 0, 0.5999999999999984), z_dir=(1e-16, -1, -8e-17))) as fillet3_piece_41:
        with BuildLine():
            CenterArc((7 + FILLET3_R, FILLET3_R), FILLET3_R, 179.99999999999827, 90.00000000000142)
            Line((7.000000000000004, FILLET3_R), (7, 1e-16))
            Line((7, 1e-16), (7 + FILLET3_R, -2.975e-14))
        make_face()
    revolve(axis=Axis((-75.31666666666663, -6.999999999999999, -176.70000000000002), (-0.5999999999999991, 0, -0.8000000000000007)), revolution_arc=90, mode=Mode.SUBTRACT)
    with BuildSketch(Plane(origin=(-81.3166666666666, -6.999999999999999, -184.7), x_dir=(-0.8000000000000013, 0, 0.5999999999999984), z_dir=(1e-16, -1, -8e-17))) as fillet3_piece_42:
        with BuildLine():
            CenterArc((7 + FILLET3_R, -FILLET3_R), FILLET3_R, 89.99999999999974, 90.0000000000008)
            Line((7.000000000000002, -FILLET3_R), (7, 1e-16))
            Line((7, 1e-16), (7 + FILLET3_R, 2.763e-14))
        make_face()
    revolve(axis=Axis((-81.3166666666666, -6.999999999999999, -184.7), (-0.5999999999999991, 0, -0.8000000000000007)), revolution_arc=89.99999999999994, mode=Mode.SUBTRACT)


solid = part.part
